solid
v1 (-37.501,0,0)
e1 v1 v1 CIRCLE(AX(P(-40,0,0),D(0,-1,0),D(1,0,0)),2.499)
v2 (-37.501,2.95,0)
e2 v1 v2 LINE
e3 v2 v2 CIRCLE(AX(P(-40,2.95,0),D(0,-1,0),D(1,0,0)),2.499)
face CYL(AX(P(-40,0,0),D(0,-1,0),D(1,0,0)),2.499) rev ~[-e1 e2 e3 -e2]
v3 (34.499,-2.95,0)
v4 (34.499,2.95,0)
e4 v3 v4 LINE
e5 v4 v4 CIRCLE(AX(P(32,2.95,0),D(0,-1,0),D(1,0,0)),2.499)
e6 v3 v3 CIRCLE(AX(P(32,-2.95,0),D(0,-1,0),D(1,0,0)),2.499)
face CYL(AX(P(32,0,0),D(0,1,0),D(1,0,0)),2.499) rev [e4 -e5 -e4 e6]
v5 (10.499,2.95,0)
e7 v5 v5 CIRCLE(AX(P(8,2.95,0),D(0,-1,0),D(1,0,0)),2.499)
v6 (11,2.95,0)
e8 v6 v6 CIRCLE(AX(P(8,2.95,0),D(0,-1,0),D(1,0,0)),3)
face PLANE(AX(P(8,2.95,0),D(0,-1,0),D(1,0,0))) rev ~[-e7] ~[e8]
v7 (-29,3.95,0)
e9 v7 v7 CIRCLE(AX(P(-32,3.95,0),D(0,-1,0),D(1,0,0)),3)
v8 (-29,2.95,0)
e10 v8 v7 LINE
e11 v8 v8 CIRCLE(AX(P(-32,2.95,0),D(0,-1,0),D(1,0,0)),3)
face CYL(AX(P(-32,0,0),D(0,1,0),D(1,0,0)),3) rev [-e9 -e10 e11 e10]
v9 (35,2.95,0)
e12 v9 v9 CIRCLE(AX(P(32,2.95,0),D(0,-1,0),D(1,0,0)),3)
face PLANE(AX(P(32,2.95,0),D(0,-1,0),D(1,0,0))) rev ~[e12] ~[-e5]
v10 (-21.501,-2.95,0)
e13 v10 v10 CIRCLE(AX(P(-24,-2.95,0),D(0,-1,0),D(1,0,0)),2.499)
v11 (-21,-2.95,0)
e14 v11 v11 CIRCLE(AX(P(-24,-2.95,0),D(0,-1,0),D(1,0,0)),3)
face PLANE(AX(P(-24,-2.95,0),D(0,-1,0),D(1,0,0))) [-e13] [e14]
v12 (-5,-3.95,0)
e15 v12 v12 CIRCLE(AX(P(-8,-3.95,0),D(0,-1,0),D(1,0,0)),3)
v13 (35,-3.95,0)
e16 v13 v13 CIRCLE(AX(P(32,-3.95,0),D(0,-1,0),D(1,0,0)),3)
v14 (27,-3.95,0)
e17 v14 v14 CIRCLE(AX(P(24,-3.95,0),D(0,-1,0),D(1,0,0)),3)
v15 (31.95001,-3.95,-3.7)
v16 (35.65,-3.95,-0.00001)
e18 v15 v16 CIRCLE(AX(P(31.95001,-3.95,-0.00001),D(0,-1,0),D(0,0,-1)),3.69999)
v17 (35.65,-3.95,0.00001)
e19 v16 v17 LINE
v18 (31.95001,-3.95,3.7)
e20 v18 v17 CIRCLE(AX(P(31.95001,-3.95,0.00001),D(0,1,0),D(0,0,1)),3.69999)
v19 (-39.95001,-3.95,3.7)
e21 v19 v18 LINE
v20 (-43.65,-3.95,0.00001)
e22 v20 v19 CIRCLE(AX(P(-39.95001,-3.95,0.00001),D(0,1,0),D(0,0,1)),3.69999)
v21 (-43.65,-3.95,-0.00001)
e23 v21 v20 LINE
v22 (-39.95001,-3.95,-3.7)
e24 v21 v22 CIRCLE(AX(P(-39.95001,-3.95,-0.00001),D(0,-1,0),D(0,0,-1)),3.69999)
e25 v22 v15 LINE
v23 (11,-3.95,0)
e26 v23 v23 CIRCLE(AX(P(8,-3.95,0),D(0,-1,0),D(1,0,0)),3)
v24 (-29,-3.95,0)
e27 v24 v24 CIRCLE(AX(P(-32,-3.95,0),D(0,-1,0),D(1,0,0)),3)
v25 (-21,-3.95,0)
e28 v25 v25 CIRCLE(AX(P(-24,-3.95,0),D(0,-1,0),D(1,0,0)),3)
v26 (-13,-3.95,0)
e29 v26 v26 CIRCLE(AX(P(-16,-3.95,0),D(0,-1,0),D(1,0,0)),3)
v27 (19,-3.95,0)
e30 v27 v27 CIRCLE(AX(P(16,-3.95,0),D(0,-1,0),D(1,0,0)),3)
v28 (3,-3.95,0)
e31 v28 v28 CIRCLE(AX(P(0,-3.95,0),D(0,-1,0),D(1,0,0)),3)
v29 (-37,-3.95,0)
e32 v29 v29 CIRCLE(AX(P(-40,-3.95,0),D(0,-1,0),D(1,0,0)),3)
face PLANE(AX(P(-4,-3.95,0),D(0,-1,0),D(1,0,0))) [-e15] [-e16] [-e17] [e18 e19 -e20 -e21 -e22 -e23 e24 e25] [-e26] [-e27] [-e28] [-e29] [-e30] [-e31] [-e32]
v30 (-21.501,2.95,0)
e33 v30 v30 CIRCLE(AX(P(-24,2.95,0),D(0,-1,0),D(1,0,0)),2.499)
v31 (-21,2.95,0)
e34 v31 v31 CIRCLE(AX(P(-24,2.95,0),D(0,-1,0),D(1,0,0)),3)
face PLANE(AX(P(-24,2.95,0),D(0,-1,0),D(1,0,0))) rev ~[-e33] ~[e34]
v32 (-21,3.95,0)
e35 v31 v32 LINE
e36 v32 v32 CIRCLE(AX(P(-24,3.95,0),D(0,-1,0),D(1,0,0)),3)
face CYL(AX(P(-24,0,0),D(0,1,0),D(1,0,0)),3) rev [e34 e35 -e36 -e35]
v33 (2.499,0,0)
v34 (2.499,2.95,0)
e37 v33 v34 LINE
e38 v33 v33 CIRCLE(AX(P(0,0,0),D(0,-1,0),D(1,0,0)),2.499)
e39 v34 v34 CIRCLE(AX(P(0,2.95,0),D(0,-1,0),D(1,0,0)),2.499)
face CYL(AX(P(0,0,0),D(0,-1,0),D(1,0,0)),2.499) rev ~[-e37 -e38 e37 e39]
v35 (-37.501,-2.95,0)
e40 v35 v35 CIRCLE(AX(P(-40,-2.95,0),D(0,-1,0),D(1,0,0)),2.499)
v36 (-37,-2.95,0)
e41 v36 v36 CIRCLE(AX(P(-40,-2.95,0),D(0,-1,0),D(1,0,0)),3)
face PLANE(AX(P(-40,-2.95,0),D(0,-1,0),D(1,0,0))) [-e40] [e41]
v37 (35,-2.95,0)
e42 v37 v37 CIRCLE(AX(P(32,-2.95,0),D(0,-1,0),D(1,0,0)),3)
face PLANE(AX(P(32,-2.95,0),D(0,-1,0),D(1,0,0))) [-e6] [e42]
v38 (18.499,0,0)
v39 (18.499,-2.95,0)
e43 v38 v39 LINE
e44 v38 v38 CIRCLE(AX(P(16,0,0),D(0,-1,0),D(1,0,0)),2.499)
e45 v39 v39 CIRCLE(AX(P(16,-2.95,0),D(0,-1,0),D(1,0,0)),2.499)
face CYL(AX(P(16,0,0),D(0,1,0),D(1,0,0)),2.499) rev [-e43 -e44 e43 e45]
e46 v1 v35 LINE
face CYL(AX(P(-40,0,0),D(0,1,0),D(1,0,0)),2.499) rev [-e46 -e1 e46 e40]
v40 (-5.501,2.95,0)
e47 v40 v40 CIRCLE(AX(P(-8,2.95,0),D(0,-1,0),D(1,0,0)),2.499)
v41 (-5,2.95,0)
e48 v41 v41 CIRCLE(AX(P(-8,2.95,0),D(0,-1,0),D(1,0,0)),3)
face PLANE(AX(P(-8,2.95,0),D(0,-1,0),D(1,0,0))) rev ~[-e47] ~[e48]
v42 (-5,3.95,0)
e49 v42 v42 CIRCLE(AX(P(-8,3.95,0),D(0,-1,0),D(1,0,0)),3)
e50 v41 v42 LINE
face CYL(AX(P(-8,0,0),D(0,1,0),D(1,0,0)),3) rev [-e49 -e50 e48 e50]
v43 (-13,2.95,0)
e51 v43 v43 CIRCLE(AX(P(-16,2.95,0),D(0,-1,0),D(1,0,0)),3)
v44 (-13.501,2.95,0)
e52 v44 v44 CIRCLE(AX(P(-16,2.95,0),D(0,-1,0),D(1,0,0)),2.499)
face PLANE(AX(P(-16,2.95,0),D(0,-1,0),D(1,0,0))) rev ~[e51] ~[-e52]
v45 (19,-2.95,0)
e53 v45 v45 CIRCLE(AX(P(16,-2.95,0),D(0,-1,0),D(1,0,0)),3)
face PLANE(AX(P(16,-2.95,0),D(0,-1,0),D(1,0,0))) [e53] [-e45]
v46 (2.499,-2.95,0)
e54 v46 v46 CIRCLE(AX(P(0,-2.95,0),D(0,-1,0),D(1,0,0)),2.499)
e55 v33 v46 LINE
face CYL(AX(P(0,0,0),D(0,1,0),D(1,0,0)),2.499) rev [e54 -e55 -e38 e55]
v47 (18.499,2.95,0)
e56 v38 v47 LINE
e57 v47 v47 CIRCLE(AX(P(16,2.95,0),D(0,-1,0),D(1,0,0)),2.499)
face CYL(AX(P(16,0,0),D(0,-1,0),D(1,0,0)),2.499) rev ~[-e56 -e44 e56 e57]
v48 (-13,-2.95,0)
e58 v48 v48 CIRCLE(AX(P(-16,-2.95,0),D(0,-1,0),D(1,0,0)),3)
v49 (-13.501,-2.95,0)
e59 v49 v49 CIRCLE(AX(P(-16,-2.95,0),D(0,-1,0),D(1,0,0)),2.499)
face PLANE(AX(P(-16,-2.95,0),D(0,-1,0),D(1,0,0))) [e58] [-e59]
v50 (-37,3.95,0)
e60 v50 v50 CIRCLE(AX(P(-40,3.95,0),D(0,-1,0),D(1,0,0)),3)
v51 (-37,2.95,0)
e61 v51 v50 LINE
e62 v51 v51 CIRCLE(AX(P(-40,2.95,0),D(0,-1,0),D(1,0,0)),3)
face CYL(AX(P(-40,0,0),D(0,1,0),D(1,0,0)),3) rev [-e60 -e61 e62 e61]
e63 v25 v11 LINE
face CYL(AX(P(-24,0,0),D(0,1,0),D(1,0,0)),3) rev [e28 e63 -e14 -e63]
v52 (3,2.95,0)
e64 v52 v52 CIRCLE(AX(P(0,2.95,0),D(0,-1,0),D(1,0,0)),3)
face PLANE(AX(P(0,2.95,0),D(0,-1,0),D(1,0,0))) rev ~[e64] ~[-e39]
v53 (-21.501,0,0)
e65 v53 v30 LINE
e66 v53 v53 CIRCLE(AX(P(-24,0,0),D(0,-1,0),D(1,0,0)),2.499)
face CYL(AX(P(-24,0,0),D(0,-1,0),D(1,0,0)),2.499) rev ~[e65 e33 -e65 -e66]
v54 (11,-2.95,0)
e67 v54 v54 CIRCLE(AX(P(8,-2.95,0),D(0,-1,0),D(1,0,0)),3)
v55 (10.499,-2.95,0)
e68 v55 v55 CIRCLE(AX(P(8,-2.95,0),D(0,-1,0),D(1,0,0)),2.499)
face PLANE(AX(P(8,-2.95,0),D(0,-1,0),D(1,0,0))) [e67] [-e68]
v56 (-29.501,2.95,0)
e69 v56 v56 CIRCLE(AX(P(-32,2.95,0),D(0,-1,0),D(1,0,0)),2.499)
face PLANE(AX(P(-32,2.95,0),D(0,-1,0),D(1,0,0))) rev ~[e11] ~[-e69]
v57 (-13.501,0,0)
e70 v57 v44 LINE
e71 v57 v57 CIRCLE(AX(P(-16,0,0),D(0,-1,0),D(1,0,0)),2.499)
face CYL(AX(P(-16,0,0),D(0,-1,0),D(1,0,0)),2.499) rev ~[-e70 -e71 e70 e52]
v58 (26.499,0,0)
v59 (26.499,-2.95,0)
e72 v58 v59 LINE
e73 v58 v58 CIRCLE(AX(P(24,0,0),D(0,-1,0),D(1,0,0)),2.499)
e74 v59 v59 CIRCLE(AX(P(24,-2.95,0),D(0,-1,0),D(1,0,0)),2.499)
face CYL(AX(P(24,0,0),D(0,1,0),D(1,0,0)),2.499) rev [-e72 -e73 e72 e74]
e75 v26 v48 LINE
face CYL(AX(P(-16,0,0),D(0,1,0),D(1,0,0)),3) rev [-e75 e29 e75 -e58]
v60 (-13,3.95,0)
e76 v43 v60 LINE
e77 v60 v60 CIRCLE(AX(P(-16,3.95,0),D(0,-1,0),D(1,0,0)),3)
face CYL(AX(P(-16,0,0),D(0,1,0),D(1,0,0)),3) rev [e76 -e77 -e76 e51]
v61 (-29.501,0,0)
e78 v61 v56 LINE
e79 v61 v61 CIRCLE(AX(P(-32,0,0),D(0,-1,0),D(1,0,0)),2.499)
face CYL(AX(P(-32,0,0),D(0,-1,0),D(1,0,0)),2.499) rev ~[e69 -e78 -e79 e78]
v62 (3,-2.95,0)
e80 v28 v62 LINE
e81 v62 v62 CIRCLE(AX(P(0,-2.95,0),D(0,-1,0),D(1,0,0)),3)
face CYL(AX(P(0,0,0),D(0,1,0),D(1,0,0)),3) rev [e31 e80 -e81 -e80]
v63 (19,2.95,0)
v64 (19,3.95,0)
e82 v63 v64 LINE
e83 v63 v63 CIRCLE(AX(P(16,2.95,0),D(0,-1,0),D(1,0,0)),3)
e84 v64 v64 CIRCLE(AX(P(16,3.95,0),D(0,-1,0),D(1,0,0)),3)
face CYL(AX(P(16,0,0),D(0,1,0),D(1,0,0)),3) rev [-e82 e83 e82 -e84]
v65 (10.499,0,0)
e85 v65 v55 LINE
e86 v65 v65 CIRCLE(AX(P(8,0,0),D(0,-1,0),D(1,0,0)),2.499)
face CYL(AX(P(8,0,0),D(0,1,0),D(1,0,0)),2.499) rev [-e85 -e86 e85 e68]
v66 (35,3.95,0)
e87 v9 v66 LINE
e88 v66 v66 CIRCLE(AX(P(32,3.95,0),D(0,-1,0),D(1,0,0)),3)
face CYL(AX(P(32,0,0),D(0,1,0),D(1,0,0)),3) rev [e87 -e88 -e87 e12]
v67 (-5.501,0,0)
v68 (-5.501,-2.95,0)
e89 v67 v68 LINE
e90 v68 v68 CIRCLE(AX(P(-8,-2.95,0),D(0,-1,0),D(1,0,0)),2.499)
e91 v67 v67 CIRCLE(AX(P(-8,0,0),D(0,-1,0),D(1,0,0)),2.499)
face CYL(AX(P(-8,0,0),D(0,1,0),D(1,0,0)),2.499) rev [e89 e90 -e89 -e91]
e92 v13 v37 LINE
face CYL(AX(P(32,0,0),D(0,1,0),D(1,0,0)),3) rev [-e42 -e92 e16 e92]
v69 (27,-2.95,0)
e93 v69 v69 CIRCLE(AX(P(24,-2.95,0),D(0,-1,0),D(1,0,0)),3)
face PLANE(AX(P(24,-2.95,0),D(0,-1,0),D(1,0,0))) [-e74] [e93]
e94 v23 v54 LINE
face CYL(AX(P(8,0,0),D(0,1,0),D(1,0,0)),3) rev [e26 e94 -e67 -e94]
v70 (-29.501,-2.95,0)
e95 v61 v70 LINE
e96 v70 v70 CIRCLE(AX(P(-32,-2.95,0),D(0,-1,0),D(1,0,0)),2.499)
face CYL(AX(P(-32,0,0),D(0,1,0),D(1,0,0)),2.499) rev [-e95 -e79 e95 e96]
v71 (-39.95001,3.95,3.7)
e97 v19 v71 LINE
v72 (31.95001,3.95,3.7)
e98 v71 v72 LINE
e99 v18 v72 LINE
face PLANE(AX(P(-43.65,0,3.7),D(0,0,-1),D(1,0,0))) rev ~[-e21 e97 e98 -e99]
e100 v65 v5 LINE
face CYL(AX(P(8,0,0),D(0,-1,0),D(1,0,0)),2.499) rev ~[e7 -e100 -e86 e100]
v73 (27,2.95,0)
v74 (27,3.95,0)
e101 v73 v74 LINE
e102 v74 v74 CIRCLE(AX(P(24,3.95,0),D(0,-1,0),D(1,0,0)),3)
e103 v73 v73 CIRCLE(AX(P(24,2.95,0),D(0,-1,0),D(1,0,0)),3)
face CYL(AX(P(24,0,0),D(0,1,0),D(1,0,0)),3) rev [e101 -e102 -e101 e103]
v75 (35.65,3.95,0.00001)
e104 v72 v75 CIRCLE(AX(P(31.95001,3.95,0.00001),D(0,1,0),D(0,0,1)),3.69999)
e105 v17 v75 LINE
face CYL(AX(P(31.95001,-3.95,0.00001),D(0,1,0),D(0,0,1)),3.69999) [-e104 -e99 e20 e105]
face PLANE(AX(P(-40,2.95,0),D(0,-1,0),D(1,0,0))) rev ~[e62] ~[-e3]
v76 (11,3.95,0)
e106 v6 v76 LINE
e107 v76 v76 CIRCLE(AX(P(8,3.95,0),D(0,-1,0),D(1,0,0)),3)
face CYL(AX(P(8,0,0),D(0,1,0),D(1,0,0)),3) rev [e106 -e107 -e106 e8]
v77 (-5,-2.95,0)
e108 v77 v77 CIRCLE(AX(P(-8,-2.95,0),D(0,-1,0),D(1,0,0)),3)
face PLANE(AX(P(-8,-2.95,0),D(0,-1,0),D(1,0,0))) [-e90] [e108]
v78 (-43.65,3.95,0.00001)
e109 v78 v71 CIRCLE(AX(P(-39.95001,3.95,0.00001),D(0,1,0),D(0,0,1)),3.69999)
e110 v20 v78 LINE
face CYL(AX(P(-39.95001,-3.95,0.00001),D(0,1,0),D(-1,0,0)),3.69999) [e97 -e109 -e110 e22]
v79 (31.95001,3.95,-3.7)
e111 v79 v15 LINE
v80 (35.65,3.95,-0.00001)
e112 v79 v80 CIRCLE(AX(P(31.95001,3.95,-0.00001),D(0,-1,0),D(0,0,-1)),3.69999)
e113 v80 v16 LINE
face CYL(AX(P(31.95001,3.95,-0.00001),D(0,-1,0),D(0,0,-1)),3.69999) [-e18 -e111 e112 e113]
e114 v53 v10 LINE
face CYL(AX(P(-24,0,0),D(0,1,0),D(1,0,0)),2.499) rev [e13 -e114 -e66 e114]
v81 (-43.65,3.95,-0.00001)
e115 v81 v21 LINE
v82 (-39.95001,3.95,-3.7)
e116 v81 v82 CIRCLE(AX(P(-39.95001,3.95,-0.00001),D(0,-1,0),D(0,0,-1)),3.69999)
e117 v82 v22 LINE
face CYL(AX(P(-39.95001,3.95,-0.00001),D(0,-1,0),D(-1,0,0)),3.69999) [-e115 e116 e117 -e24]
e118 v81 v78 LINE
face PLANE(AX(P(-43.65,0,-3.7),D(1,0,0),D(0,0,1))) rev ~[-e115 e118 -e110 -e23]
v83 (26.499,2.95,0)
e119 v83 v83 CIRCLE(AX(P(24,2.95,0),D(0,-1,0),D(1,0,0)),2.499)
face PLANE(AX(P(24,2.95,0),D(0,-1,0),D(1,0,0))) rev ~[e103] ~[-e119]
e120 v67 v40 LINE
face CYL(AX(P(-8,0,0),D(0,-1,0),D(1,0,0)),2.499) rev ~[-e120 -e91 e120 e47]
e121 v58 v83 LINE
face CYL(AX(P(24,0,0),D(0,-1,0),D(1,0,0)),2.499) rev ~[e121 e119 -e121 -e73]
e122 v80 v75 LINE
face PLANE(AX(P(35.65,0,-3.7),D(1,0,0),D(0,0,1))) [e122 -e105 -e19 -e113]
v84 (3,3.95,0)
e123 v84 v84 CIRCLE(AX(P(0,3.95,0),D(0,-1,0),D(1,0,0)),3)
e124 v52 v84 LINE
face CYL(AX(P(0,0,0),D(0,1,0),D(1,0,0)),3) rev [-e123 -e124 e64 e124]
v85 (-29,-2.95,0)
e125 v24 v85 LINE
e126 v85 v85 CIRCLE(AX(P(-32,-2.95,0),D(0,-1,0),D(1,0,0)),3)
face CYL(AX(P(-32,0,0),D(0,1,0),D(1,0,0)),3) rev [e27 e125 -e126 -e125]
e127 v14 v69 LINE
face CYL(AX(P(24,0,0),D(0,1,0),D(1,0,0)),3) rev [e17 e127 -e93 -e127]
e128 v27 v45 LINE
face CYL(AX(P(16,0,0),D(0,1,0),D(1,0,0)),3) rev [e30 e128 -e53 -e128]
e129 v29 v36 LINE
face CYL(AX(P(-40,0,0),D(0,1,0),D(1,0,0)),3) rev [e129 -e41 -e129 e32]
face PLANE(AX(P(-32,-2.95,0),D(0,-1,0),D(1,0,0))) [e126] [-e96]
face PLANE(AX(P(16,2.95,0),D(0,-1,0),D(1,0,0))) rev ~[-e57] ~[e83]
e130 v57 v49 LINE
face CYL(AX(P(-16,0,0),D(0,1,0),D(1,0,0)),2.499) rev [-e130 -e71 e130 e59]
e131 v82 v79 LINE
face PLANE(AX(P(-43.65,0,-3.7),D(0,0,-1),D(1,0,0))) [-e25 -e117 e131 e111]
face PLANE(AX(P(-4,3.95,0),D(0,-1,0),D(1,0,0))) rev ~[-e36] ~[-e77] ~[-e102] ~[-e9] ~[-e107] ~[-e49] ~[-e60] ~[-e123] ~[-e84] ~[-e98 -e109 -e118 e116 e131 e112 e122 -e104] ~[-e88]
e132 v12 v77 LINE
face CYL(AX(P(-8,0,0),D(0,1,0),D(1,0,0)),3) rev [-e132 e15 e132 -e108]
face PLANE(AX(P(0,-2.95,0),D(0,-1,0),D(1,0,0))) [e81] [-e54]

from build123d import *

# Parameters (mm, degrees)
F0_W     = 79.3
F0_H     = 7.4
F0_R     = 3
F1_DEPTH = 3.95
F0_R_2   = 2.499
F2_DEPTH = 2.95
F3_R     = 3.69999


# Not quite as in the source:
# - a fillet or chamfer is up to 0.001 mm smaller than in the source, because OpenCascade refuses the exact size


with BuildPart() as f1:
    # F0 (on Front) → F1 (new body, symmetric)
    with BuildSketch(Plane.XZ):
        with Locations((-4, 0)):
            Rectangle(F0_W, F0_H)
        with Locations((-40, 0)):
            Circle(F0_R, mode=Mode.SUBTRACT)
        with Locations((-32, 0)):
            Circle(F0_R, mode=Mode.SUBTRACT)
        with Locations((-24, 0)):
            Circle(F0_R, mode=Mode.SUBTRACT)
        with Locations((-16, 0)):
            Circle(F0_R, mode=Mode.SUBTRACT)
        with Locations((-8, 0)):
            Circle(F0_R, mode=Mode.SUBTRACT)
        Circle(F0_R, mode=Mode.SUBTRACT)
        with Locations((8, 0)):
            Circle(F0_R, mode=Mode.SUBTRACT)
        with Locations((16, 0)):
            Circle(F0_R, mode=Mode.SUBTRACT)
        with Locations((24, 0)):
            Circle(F0_R, mode=Mode.SUBTRACT)
        with Locations((32, 0)):
            Circle(F0_R, mode=Mode.SUBTRACT)
    extrude(amount=F1_DEPTH, both=True)

    # F0 (on Front) → F2 (join, symmetric)
    with BuildSketch(Plane.XZ):
        with Locations((-40, 0)):
            Circle(F0_R)
        with Locations((-40, 0)):
            Circle(F0_R_2, mode=Mode.SUBTRACT)
        with Locations((-32, 0)):
            Circle(F0_R)
        with Locations((-32, 0)):
            Circle(F0_R_2, mode=Mode.SUBTRACT)
        with Locations((-24, 0)):
            Circle(F0_R)
        with Locations((-24, 0)):
            Circle(F0_R_2, mode=Mode.SUBTRACT)
        with Locations((-16, 0)):
            Circle(F0_R)
        with Locations((-16, 0)):
            Circle(F0_R_2, mode=Mode.SUBTRACT)
        with Locations((-8, 0)):
            Circle(F0_R)
        with Locations((-8, 0)):
            Circle(F0_R_2, mode=Mode.SUBTRACT)
        Circle(F0_R)
        Circle(F0_R_2, mode=Mode.SUBTRACT)
        with Locations((8, 0)):
            Circle(F0_R)
        with Locations((8, 0)):
            Circle(F0_R_2, mode=Mode.SUBTRACT)
        with Locations((16, 0)):
            Circle(F0_R)
        with Locations((16, 0)):
            Circle(F0_R_2, mode=Mode.SUBTRACT)
        with Locations((24, 0)):
            Circle(F0_R)
        with Locations((24, 0)):
            Circle(F0_R_2, mode=Mode.SUBTRACT)
        with Locations((32, 0)):
            Circle(F0_R)
        with Locations((32, 0)):
            Circle(F0_R_2, mode=Mode.SUBTRACT)
    extrude(amount=F2_DEPTH, both=True)

    # F3 (radius 3.7 in the source; OpenCascade refuses exactly that, so slightly less here)
    f3_edges = [f1.edges().sort_by_distance(p)[0] for p in [
        (-43.65, 0, 3.7),
        (35.65, 0, 3.7),
        (35.65, 0, -3.7),
        (-43.65, 0, -3.7),
    ]]
    fillet(f3_edges, radius=F3_R)


solid = f1.part
